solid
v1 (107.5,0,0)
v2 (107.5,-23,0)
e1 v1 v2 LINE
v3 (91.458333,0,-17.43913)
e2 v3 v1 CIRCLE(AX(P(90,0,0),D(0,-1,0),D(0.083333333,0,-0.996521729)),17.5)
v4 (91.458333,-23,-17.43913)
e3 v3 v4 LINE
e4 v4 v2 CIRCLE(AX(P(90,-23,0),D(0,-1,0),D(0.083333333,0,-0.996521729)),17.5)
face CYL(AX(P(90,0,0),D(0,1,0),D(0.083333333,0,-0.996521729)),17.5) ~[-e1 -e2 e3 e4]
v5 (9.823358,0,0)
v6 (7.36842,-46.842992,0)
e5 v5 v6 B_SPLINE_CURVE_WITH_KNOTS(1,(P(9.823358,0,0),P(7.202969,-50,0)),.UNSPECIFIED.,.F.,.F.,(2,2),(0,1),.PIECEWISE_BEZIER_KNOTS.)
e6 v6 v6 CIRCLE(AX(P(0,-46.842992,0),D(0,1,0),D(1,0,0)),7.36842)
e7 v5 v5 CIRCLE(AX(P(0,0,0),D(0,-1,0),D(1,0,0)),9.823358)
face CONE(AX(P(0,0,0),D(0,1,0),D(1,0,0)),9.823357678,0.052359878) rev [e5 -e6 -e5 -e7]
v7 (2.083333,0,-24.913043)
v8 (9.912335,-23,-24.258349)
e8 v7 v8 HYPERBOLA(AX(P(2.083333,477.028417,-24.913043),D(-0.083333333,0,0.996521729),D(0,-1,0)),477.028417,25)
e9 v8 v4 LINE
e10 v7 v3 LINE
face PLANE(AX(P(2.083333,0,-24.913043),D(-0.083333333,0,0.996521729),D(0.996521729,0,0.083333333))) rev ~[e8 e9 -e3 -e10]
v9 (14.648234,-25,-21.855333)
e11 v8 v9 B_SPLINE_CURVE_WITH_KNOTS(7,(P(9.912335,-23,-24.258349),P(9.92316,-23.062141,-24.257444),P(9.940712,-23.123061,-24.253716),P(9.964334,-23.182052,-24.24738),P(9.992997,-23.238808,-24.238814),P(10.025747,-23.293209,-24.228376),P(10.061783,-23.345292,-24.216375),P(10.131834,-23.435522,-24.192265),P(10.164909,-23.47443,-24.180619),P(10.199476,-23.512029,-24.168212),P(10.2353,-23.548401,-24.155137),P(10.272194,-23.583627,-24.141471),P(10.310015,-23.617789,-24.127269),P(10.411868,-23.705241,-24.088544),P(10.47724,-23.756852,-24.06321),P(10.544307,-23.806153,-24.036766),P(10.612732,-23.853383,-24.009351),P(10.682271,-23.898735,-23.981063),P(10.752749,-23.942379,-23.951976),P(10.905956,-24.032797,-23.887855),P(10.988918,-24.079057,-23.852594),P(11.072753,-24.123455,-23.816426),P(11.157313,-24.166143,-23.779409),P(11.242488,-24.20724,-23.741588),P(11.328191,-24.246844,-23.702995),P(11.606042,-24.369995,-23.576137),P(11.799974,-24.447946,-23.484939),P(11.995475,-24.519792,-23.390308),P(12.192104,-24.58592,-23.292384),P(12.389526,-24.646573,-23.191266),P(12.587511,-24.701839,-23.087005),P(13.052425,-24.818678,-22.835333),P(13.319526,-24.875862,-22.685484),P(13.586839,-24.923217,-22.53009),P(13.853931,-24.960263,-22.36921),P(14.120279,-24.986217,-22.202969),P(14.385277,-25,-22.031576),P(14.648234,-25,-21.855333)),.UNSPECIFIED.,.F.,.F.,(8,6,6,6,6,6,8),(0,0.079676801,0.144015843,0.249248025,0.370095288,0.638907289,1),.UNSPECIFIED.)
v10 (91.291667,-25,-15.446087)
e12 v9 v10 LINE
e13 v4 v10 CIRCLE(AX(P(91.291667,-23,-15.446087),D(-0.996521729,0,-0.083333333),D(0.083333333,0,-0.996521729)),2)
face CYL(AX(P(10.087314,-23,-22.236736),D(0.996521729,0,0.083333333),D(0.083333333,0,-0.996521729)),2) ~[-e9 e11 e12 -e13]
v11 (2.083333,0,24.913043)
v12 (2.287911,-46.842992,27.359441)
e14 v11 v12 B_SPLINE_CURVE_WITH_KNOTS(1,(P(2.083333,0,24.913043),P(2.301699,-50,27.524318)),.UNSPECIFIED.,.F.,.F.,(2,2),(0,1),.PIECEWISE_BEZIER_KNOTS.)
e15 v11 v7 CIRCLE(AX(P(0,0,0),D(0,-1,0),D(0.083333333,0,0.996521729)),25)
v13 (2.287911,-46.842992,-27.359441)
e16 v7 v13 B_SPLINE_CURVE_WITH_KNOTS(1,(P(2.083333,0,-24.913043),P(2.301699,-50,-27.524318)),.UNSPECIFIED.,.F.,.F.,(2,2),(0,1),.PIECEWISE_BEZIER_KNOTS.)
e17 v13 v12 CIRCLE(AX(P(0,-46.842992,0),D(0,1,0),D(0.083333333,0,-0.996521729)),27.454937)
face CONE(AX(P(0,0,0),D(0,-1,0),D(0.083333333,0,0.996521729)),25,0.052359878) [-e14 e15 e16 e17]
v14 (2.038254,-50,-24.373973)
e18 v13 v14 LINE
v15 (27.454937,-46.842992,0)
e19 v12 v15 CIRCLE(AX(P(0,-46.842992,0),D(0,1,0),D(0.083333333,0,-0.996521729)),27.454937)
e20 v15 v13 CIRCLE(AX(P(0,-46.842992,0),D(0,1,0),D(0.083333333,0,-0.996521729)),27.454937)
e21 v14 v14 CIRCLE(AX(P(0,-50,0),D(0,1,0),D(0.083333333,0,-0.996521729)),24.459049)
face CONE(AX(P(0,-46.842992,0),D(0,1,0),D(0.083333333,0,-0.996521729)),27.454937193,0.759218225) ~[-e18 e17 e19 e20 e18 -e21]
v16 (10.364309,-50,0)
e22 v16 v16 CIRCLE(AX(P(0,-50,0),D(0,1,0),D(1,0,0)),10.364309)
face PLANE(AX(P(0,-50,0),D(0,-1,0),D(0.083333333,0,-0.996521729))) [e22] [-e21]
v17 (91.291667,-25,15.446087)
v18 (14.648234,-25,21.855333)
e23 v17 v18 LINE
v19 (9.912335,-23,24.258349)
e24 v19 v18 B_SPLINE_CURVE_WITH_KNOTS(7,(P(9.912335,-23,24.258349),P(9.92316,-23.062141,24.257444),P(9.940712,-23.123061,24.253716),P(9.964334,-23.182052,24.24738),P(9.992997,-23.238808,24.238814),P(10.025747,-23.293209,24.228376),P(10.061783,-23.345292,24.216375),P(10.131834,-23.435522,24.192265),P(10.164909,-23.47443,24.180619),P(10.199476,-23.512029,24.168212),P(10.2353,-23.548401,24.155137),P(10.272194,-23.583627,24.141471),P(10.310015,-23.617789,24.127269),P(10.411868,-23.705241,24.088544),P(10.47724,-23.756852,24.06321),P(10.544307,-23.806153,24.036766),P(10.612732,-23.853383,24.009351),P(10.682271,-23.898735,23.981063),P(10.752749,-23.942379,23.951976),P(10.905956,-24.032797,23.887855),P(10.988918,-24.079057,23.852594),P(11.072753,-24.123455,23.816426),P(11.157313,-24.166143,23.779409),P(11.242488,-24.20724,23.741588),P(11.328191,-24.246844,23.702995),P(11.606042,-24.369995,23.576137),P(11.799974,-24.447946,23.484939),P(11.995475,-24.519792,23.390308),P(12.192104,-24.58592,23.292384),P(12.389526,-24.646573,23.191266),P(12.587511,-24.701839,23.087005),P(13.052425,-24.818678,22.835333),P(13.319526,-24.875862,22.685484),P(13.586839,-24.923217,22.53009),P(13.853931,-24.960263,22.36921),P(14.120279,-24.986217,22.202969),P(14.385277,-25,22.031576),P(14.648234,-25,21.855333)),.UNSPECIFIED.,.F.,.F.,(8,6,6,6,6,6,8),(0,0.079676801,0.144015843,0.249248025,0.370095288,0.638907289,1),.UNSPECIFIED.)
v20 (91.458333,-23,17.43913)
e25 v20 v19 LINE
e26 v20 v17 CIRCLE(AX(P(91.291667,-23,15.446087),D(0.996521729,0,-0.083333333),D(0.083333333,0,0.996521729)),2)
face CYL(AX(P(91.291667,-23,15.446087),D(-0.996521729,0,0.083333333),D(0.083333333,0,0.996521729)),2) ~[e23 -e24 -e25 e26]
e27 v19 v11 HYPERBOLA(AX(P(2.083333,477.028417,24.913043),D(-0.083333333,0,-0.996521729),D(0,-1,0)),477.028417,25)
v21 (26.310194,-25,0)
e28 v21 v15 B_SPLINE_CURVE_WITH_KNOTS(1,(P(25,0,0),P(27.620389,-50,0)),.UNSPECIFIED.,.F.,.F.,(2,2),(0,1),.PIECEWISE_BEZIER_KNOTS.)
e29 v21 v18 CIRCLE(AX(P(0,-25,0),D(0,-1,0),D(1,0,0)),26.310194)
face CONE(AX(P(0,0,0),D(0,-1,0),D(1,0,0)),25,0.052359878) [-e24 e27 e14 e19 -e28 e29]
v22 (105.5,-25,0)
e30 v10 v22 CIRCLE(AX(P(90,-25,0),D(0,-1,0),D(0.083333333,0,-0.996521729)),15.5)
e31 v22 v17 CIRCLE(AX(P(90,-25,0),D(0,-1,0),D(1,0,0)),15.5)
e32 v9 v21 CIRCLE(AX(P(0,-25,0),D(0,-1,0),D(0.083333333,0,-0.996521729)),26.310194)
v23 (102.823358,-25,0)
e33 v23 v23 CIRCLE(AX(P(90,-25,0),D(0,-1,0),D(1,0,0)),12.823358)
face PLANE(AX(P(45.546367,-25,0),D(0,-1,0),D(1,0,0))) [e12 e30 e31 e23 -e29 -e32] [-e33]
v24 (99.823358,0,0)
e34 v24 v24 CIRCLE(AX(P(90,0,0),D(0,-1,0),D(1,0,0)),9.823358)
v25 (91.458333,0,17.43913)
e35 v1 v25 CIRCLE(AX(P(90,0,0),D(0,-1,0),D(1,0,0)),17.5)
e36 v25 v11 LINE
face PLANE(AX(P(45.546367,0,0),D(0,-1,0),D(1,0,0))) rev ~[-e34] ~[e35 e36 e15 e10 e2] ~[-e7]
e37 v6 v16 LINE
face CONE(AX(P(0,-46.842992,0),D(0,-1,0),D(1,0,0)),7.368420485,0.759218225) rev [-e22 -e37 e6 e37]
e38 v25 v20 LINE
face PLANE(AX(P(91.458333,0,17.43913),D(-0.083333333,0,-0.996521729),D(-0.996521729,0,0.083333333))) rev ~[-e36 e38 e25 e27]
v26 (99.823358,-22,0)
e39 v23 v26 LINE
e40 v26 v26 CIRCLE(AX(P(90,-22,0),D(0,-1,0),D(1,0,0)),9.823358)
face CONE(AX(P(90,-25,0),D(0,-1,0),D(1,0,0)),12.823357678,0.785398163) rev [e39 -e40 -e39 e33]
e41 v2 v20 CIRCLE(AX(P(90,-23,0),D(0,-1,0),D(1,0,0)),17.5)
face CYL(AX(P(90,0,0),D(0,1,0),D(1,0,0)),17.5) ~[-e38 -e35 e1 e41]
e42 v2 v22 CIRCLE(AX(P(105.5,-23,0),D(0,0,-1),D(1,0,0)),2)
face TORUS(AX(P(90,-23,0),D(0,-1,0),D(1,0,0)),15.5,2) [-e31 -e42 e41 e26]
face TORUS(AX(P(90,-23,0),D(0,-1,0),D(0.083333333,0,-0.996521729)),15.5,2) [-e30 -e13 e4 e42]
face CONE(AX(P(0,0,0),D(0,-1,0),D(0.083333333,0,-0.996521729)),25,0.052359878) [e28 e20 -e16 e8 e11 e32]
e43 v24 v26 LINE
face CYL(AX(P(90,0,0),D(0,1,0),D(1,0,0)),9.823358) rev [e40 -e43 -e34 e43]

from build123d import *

# Parameters (mm, degrees)
F0_R     = 9.8233576781
F1_DEPTH = 25
F2_DEPTH = 50
F2_TAPER = -3
F4_R     = 2


# Not quite as in the source:
# - a fillet or chamfer that OpenCascade refuses, or shapes differently, is made with other operations: its cross-section is extruded or revolved along the edge and cut away or added


with BuildPart() as f1:
    # F0 (on Front) → F1 (new body)
    with BuildSketch(Plane.XZ):
        with BuildLine():
            ThreePointArc((2.0833333333, 24.9130432148), (18.3995018048, 16.9250800097), (25, 0))
            ThreePointArc((25, 0), (18.3995018048, -16.9250800097), (2.0833333333, -24.9130432148))
            Line((2.0833333333, -24.9130432148), (91.4583333333, -17.4391302504))
            ThreePointArc((91.4583333333, -17.4391302504), (72.5, 0), (91.4583333333, 17.4391302504))
            Line((91.4583333333, 17.4391302504), (2.0833333333, 24.9130432148))
        make_face()
        with BuildLine():
            ThreePointArc((2.0833333333, -24.9130432148), (18.3995018048, -16.9250800097), (25, 0))
            ThreePointArc((25, 0), (18.3995018048, 16.9250800097), (2.0833333333, 24.9130432148))
            ThreePointArc((2.0833333333, 24.9130432148), (-25, 0), (2.0833333333, -24.9130432148))
        make_face()
        Circle(F0_R, mode=Mode.SUBTRACT)
        with BuildLine():
            ThreePointArc((107.5, 0), (102.8796512634, 11.8475560068), (91.4583333333, 17.4391302504))
            ThreePointArc((91.4583333333, 17.4391302504), (72.5, 0), (91.4583333333, -17.4391302504))
            ThreePointArc((91.4583333333, -17.4391302504), (102.8796512634, -11.8475560068), (107.5, 0))
        make_face()
        with Locations((90, 0)):
            Circle(F0_R, mode=Mode.SUBTRACT)
    extrude(amount=F1_DEPTH)

    # F0 (on Front) → F2 (join)
    with BuildSketch(Plane.XZ):
        with BuildLine():
            ThreePointArc((2.0833333333, -24.9130432148), (18.3995018048, -16.9250800097), (25, 0))
            ThreePointArc((25, 0), (18.3995018048, 16.9250800097), (2.0833333333, 24.9130432148))
            ThreePointArc((2.0833333333, 24.9130432148), (-25, 0), (2.0833333333, -24.9130432148))
        make_face()
        Circle(F0_R, mode=Mode.SUBTRACT)
    extrude(amount=F2_DEPTH, taper=F2_TAPER)

    # F3: chamfer of 3 on 3 edges, made by hand

    # F3_s1 → F3_t2 (revolve, cut)
    with BuildSketch(Plane.XY):
        Polygon((102.8233576781, -25), (99.8233576781, -22), (99.8233576781, -25), align=None)
    revolve(axis=Axis((90, -25, 0), (0, -1, 0)), mode=Mode.SUBTRACT)

    # F3_s3 → F3_t4 (revolve, cut)
    with BuildSketch(Plane.XY):
        Polygon((7.3684204855, -46.8429921313), (10.3643090898, -50), (7.2029687139, -50), align=None)
    revolve(axis=Axis((0, -50, 0), (0, 1, 0)), mode=Mode.SUBTRACT)

    # F3_s5 → F3_t6 (revolve, cut)
    with BuildSketch(Plane(origin=(0, 0, 0), x_dir=(0, 1, 0), z_dir=(0.9965217286, 0, 0.0833333333))):
        Polygon((-46.8429921313, -27.4549371926), (-50, -24.4590485883), (-50, -27.6203889642), align=None)
    revolve(axis=Axis((0, -50, 0), (0, 1, 0)), mode=Mode.SUBTRACT)

    # F4
    f4_edges = [f1.edges().sort_by_distance(p)[0] for p in [
        (50.856157, -25, -20.834455),
        (107.5, -25, 0),
        (50.856157, -25, 20.834455),
    ]]
    fillet(f4_edges, radius=F4_R)


solid = f1.part
